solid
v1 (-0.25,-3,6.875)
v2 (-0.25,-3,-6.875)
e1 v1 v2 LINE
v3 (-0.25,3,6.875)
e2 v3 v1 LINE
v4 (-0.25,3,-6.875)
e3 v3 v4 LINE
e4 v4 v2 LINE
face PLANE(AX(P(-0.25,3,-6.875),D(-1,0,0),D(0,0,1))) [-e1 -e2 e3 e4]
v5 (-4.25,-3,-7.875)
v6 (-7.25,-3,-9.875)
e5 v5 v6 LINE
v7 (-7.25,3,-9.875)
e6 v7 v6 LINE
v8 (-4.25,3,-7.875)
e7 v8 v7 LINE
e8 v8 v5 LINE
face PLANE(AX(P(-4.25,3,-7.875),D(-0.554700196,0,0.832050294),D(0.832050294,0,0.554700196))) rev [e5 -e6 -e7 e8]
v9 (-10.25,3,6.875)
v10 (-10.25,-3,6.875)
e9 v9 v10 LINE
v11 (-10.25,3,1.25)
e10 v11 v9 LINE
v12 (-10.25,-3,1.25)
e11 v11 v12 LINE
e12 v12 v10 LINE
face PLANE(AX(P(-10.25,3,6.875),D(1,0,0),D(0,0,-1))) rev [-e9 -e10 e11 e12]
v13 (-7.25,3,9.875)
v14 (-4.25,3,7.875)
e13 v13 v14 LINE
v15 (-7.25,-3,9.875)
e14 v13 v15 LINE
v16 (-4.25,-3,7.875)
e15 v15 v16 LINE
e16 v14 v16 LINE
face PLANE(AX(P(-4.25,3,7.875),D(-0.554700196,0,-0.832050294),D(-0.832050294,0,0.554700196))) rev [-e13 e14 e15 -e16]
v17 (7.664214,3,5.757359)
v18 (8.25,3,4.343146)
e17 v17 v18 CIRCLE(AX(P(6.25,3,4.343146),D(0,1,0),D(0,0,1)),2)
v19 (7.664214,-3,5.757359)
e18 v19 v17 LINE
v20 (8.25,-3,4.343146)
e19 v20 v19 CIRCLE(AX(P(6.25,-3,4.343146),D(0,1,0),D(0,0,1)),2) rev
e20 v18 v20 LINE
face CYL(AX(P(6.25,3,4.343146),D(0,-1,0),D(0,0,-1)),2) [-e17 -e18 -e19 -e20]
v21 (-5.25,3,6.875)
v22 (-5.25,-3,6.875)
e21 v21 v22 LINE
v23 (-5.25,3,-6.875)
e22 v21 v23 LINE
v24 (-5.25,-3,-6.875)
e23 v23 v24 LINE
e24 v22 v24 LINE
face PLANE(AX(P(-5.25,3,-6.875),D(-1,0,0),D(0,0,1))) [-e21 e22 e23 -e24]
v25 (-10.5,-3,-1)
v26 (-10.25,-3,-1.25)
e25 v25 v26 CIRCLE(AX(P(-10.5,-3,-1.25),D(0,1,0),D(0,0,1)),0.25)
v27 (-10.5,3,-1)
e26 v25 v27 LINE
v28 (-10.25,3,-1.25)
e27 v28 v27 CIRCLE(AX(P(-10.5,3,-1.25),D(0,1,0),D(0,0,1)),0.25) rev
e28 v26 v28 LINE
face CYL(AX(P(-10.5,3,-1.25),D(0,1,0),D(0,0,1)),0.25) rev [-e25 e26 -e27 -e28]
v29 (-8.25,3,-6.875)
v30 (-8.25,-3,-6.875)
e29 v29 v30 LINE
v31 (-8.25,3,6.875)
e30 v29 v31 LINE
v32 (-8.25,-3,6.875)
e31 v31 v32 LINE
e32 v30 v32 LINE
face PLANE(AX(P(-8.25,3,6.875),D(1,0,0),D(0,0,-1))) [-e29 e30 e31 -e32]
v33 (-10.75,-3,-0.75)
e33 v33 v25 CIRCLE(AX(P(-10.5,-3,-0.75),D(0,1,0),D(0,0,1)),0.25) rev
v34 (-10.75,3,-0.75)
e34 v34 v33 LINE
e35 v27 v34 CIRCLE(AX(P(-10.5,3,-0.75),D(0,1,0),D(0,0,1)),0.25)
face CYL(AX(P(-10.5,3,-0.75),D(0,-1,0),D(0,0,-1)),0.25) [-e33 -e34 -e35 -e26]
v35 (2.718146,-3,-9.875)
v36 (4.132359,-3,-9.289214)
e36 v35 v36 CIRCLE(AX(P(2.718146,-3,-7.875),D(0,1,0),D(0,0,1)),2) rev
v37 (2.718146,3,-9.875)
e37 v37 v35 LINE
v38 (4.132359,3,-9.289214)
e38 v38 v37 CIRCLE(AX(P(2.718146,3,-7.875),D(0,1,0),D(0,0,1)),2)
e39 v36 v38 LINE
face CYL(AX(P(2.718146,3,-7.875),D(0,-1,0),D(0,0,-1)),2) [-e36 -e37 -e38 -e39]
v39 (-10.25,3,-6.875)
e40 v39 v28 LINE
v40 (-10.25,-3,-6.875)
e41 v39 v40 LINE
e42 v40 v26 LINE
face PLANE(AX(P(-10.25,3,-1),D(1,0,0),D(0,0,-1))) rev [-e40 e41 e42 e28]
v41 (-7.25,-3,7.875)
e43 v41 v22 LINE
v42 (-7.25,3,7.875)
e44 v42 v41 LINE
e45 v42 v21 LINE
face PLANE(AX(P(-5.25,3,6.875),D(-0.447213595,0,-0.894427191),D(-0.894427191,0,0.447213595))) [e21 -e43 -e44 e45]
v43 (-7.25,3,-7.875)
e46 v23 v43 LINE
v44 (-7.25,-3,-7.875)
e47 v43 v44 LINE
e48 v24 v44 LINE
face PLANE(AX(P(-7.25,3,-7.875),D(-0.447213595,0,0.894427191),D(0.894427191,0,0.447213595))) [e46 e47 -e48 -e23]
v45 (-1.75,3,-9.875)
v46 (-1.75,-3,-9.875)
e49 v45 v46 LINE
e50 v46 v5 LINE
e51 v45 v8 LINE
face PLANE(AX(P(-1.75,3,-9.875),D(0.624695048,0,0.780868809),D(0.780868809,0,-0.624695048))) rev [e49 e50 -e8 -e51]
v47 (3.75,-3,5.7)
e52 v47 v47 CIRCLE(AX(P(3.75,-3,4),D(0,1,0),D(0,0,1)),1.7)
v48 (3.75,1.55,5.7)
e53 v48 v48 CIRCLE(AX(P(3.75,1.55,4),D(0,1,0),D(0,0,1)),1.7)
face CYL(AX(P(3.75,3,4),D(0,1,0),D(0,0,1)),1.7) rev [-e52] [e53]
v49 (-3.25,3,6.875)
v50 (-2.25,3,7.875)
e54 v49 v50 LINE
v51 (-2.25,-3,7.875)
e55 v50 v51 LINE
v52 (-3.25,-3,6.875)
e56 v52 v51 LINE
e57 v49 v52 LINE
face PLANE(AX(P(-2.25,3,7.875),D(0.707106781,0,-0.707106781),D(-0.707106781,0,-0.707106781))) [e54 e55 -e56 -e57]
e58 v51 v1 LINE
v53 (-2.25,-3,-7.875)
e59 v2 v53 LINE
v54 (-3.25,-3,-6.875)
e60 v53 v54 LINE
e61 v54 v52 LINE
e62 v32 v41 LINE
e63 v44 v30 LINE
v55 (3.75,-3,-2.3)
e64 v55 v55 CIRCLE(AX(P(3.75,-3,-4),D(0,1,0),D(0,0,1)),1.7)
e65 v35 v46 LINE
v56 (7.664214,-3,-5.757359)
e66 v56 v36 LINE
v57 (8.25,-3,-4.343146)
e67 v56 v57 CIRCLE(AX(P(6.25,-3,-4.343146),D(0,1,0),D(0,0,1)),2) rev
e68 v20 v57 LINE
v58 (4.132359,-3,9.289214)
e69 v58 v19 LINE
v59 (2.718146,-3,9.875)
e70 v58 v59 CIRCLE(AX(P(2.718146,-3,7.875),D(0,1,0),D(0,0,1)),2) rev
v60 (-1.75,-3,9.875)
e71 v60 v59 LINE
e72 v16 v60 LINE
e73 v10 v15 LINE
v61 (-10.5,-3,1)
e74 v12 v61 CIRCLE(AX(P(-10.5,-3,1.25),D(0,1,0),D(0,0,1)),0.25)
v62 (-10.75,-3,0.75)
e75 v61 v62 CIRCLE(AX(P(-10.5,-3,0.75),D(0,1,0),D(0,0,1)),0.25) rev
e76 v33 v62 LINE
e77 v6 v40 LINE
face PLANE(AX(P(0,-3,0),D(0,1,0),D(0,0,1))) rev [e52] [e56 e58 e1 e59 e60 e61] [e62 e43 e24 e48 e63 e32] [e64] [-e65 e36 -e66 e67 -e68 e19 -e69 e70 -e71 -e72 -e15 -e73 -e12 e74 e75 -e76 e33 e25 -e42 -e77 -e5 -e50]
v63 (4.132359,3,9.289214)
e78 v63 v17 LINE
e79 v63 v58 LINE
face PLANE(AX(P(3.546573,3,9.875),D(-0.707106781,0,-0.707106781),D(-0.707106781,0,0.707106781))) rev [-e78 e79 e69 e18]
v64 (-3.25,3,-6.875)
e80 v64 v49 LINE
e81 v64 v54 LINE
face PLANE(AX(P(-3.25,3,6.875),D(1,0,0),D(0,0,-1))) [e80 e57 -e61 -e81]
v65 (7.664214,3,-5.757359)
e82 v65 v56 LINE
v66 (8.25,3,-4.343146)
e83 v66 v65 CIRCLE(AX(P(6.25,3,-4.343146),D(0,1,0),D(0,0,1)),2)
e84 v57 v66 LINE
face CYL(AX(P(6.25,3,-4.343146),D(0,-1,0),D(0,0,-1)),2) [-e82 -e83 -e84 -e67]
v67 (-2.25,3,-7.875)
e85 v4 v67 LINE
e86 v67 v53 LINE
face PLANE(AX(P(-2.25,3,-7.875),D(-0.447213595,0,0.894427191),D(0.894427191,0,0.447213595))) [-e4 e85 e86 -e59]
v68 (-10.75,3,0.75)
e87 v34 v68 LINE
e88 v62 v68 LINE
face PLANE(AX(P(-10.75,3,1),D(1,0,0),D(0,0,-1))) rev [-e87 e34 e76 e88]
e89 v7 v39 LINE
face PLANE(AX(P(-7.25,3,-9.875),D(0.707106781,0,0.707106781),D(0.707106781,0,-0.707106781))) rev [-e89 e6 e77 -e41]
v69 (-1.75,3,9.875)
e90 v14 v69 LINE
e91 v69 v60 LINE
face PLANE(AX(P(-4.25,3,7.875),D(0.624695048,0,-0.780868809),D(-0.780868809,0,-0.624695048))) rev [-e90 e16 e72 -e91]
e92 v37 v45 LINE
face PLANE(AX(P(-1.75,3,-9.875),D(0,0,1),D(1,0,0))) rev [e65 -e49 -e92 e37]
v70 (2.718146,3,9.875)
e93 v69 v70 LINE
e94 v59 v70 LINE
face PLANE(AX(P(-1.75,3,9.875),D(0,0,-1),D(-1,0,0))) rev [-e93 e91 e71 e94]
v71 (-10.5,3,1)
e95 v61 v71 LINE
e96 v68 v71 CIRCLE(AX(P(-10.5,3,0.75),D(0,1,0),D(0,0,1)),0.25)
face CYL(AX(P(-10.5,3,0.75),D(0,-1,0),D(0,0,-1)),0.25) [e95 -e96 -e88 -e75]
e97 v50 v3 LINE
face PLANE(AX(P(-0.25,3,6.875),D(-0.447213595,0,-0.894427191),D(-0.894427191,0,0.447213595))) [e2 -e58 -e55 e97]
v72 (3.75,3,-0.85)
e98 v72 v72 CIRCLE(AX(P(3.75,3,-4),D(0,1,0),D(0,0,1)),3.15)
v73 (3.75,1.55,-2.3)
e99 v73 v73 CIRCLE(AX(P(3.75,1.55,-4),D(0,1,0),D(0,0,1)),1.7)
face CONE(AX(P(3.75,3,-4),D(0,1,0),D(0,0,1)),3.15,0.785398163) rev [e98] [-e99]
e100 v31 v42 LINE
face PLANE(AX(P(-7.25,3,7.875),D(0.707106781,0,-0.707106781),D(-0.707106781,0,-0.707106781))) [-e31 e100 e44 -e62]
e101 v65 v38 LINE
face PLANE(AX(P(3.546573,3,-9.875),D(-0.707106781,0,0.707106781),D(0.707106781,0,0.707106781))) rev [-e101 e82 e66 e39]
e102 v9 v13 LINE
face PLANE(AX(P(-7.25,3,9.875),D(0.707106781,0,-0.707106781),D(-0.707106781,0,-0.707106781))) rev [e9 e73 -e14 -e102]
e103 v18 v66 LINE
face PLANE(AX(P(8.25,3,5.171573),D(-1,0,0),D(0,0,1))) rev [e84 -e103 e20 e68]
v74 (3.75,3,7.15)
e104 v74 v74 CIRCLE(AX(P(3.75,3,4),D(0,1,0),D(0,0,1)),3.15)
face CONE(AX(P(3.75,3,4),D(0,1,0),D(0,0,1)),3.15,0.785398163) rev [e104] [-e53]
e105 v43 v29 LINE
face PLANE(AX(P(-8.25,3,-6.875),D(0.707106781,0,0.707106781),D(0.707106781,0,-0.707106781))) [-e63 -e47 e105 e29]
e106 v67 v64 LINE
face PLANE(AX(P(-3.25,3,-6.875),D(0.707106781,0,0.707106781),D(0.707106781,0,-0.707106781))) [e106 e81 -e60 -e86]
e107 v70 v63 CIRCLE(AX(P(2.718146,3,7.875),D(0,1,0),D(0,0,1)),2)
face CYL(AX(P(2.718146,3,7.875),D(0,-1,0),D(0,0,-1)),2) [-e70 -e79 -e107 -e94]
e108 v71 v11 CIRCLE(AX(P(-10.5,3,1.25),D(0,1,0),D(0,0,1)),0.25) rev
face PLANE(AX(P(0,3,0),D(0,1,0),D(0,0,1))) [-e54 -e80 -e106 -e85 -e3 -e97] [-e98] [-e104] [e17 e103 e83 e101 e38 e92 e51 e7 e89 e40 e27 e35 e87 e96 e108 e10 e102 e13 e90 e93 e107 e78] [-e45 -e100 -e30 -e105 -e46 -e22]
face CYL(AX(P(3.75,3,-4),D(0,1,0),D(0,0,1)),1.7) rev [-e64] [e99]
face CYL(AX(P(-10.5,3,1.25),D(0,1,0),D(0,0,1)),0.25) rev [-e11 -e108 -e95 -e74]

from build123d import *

# Parameters (mm, degrees)
BOSS_EXTRUDE1_DEPTH                                 = 3
FILLET1_R                                           = 2
CSK_FOR_M3_COUNTERSUNK_FLAT_HEAD_SCREW1_D           = 3.4
CSK_FOR_M3_COUNTERSUNK_FLAT_HEAD_SCREW1_CSINK_D     = 6.3
CSK_FOR_M3_COUNTERSUNK_FLAT_HEAD_SCREW1_CSINK_ANGLE = 90
FILLET2_R                                           = 0.25


with BuildPart() as part:
    # Sketch1 → Boss-Extrude1 (new, symmetric)
    with BuildSketch(Plane(origin=(0, 0, 0), x_dir=(1, 0, 0), z_dir=(0, 1, 0))):
        Polygon((-1.75, -9.875), (3.546572875, -9.875), (8.25, -5.171572875), (8.25, 5.171572875), (3.546572875, 9.875), (-1.75, 9.875), (-4.25, 7.875), (-7.25, 9.875), (-10.25, 6.875), (-10.25, 1), (-10.75, 1), (-10.75, -1), (-10.25, -1), (-10.25, -6.875), (-7.25, -9.875), (-4.25, -7.875), align=None)
        Polygon((-8.25, -6.875), (-8.25, 6.875), (-7.25, 7.875), (-5.25, 6.875), (-5.25, -6.875), (-7.25, -7.875), align=None, mode=Mode.SUBTRACT)
        Polygon((-3.25, -6.875), (-3.25, 6.875), (-2.25, 7.875), (-0.25, 6.875), (-0.25, -6.875), (-2.25, -7.875), align=None, mode=Mode.SUBTRACT)
    extrude(amount=BOSS_EXTRUDE1_DEPTH, both=True)

    # Fillet1
    fillet1_edges = [part.edges().sort_by_distance(p)[0] for p in [
        (3.546572875, 0, -9.875),
        (8.25, 0, -5.171572875),
        (8.25, 0, 5.171572875),
        (3.546572875, 0, 9.875),
    ]]
    fillet(fillet1_edges, radius=FILLET1_R)

    # CSK for M3 Countersunk Flat Head Screw1 (through all)
    with Locations(Plane(origin=(0, 3, 0), x_dir=(1, 0, 0), z_dir=(0, 1, 0))):
        with Locations((3.75, 4), (3.75, -4)):
            CounterSinkHole(CSK_FOR_M3_COUNTERSUNK_FLAT_HEAD_SCREW1_D / 2, CSK_FOR_M3_COUNTERSUNK_FLAT_HEAD_SCREW1_CSINK_D / 2, counter_sink_angle=CSK_FOR_M3_COUNTERSUNK_FLAT_HEAD_SCREW1_CSINK_ANGLE)

    # Fillet2
    fillet2_edges = [part.edges().sort_by_distance(p)[0] for p in [
        (-10.25, 0, -1),
        (-10.25, 0, 1),
    ]]
    fillet(fillet2_edges, radius=FILLET2_R)
    fillet2_2_edges = [part.edges().sort_by_distance(p)[0] for p in [
        (-10.75, 0, -1),
        (-10.75, 0, 1),
    ]]
    fillet(fillet2_2_edges, radius=FILLET2_R - 0.0001)  # a hair under: the kernel refuses the full size


solid = part.part
